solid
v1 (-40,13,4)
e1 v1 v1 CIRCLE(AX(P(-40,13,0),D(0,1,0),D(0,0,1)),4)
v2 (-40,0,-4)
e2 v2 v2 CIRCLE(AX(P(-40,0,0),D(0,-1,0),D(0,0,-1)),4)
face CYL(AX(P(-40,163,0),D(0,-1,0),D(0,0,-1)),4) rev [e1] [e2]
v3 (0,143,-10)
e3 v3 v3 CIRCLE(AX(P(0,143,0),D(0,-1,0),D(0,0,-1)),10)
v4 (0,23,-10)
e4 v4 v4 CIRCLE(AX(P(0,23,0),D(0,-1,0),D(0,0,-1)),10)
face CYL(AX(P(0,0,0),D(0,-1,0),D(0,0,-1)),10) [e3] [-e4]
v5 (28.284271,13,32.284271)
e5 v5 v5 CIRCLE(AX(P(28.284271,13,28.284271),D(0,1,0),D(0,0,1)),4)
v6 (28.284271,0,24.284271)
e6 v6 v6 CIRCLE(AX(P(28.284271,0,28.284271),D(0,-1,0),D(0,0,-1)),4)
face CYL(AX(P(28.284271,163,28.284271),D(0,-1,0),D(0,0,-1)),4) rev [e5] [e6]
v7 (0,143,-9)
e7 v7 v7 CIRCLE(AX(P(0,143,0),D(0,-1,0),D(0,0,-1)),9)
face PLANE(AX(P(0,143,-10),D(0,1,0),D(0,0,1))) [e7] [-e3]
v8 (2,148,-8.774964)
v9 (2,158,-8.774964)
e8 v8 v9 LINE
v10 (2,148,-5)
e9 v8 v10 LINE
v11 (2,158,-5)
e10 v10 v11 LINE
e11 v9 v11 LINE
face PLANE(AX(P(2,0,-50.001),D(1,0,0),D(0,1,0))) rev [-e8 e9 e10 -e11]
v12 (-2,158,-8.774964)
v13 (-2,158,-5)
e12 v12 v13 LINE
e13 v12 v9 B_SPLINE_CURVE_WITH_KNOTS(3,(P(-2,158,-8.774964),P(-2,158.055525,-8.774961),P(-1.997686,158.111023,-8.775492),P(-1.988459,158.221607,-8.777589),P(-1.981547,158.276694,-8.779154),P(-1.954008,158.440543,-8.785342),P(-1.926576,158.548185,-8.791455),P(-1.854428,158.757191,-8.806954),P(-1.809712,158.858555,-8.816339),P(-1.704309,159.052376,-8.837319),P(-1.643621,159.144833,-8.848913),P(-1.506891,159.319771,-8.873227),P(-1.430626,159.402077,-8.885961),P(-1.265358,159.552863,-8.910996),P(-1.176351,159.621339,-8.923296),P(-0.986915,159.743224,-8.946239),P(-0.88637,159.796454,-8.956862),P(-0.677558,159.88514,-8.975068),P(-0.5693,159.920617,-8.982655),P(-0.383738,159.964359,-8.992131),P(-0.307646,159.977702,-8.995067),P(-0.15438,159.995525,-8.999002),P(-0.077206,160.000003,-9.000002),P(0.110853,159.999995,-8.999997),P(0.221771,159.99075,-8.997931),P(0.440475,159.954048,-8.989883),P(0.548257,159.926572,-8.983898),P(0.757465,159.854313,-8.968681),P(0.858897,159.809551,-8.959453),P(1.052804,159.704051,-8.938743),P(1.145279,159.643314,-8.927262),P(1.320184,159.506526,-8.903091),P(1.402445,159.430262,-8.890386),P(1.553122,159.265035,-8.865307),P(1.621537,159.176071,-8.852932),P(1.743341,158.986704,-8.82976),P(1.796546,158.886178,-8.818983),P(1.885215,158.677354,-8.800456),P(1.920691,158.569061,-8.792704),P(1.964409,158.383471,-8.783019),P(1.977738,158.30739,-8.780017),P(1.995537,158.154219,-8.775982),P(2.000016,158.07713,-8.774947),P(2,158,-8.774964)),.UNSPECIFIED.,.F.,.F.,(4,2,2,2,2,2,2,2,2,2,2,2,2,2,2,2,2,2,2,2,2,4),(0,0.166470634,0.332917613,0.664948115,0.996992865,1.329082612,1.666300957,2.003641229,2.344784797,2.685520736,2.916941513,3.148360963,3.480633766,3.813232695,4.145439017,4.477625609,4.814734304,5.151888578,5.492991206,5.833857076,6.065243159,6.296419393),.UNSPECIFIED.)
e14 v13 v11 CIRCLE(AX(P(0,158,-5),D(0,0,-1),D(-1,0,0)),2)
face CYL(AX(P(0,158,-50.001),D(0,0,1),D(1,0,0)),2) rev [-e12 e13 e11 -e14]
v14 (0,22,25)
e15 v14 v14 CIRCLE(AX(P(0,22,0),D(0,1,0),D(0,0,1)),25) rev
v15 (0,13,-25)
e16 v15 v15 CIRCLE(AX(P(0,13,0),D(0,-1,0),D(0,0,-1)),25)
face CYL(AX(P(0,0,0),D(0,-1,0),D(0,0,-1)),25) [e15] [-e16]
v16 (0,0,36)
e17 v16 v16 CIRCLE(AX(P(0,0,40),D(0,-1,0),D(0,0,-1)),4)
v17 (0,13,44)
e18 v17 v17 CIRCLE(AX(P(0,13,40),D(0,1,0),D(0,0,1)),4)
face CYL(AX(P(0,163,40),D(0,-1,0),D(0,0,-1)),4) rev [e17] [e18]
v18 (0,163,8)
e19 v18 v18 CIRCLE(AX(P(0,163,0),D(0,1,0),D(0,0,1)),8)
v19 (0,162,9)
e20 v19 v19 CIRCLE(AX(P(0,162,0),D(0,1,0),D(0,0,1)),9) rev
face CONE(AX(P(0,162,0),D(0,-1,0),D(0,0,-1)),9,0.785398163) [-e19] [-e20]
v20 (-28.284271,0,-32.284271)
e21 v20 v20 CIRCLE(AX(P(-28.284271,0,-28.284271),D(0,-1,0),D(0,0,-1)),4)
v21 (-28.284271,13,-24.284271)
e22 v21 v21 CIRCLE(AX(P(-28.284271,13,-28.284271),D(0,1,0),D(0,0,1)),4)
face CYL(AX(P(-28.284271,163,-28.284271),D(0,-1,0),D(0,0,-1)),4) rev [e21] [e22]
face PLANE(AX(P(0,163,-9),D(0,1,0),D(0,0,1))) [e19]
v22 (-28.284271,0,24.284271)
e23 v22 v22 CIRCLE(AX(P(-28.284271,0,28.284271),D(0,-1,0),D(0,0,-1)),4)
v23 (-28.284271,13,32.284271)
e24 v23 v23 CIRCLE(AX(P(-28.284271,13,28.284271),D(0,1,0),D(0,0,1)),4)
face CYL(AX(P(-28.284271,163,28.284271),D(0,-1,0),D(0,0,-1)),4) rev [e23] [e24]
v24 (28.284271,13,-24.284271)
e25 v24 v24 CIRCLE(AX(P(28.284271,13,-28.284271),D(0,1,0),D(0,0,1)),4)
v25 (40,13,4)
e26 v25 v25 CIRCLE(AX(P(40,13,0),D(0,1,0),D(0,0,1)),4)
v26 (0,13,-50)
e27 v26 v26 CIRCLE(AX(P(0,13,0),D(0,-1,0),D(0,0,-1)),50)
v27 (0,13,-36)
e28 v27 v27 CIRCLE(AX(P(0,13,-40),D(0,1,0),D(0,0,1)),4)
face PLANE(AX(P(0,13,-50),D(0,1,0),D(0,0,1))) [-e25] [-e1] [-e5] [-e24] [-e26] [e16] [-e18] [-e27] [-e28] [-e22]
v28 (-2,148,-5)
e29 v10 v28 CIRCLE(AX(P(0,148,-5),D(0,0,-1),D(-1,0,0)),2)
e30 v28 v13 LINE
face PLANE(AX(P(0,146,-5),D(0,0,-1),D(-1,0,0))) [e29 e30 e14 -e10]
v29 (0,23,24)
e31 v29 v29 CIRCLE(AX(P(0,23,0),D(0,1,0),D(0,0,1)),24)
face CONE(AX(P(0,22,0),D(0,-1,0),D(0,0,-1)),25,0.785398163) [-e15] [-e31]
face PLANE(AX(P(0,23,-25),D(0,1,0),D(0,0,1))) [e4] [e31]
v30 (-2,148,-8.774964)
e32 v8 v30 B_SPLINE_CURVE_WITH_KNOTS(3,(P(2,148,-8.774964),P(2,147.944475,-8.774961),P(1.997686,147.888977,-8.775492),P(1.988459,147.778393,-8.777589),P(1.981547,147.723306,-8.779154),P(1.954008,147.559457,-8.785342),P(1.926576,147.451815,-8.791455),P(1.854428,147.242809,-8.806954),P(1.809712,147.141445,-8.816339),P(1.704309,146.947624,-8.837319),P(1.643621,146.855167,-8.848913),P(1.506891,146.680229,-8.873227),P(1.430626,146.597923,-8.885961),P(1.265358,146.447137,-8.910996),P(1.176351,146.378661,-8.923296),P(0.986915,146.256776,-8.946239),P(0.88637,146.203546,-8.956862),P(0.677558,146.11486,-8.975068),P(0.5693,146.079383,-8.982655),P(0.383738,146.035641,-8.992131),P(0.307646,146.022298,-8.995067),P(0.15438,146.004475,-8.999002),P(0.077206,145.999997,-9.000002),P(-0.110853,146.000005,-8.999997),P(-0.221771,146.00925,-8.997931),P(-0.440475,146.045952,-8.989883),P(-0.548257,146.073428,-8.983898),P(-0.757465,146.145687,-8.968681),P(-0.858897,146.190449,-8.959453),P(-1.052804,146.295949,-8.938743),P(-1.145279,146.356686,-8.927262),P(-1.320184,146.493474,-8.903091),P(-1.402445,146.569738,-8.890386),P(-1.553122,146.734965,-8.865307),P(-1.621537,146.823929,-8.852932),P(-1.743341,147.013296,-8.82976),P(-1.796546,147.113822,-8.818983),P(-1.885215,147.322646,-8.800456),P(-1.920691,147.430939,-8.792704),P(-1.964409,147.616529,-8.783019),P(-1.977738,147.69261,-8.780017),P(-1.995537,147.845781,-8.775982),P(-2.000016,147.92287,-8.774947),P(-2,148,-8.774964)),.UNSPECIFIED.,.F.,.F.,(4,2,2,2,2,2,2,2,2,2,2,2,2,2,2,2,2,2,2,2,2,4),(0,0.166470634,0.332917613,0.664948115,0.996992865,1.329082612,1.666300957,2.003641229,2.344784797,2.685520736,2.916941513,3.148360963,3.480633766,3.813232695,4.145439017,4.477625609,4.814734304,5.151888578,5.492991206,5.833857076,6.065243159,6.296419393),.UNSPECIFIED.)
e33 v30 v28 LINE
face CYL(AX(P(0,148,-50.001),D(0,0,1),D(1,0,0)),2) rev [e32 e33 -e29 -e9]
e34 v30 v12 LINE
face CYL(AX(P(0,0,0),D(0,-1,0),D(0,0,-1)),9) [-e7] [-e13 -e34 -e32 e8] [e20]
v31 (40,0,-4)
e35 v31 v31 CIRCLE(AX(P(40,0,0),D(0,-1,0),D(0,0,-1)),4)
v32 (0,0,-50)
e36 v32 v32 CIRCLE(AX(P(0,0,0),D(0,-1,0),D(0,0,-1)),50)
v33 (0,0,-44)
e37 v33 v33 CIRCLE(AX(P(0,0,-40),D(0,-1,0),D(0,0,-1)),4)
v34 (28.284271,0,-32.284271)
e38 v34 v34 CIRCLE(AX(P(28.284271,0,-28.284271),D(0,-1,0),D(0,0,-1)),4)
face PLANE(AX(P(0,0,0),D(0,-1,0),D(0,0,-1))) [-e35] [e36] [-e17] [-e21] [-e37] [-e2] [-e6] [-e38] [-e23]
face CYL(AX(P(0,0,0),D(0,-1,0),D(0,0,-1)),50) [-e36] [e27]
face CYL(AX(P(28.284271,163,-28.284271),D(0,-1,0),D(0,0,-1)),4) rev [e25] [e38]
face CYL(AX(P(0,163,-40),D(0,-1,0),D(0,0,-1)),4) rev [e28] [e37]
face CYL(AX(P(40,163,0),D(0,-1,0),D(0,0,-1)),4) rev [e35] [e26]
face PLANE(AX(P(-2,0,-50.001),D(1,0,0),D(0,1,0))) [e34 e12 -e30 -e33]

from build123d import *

# Parameters (mm, degrees)
CHAMFER1_SIZE            = 1
CHAMFER2_SIZE            = 1
SKETCH3_R                = 4
CUT_EXTRUDE1_DEPTH       = 178.676672639
CUT_EXTRUDE2_START       = -3
CUT_EXTRUDE2_DEPTH       = 14
BOSS_EXTRUDE1_REACH      = 181.148
BOSS_EXTRUDE1_END_RADIUS = 9


with BuildPart() as part:
    # Sketch2 → Revolve1 (revolve)
    with BuildSketch(Plane(origin=(0, 0, 0), x_dir=(0, 0, -1), z_dir=(1, 0, 0))):
        Polygon((0, 0), (50, 0), (50, 13), (25, 13), (25, 23), (10, 23), (10, 143), (9, 143), (9, 163), (0, 163), align=None)
    revolve(axis=Axis((0, 0, 0), (0, 1, 0)))

    # Chamfer1
    chamfer1_edges = [part.edges().sort_by_distance(p)[0] for p in [
        (0, 163, 9),
    ]]
    chamfer(chamfer1_edges, length=CHAMFER1_SIZE)

    # Chamfer2
    chamfer2_edges = [part.edges().sort_by_distance(p)[0] for p in [
        (0, 23, 25),
    ]]
    chamfer(chamfer2_edges, length=CHAMFER2_SIZE)

    # Sketch3 → Cut-Extrude1 (cut, through all)
    with BuildSketch(Plane.XZ):
        with Locations((40, 0)):
            Circle(SKETCH3_R)
        with Locations((28.284271247, 28.284271247)):
            Circle(SKETCH3_R)
        with Locations((28.284271247, -28.284271247)):
            Circle(SKETCH3_R)
        with Locations((0, 40)):
            Circle(SKETCH3_R)
        with Locations((0, -40)):
            Circle(SKETCH3_R)
        with Locations((-28.284271247, 28.284271247)):
            Circle(SKETCH3_R)
        with Locations((-28.284271247, -28.284271247)):
            Circle(SKETCH3_R)
        with Locations((-40, 0)):
            Circle(SKETCH3_R)
    extrude(amount=-CUT_EXTRUDE1_DEPTH, mode=Mode.SUBTRACT)

    # Sketch5 → Cut-Extrude2 (cut)
    with BuildSketch(Plane(origin=(0, 163, 0), x_dir=(1, 0, 0), z_dir=(0, 1, 0)).offset(CUT_EXTRUDE2_START)):
        with BuildLine():
            Line((-3, 5), (3, 5))
            Line((3, 5), (3, 8.485281374))
            ThreePointArc((3, 8.485281374), (0, 9), (-3, 8.485281374))
            Line((-3, 8.485281374), (-3, 5))
        make_face()
    extrude(amount=-CUT_EXTRUDE2_DEPTH, mode=Mode.SUBTRACT)

    # Boss-Extrude1: up to this cylinder (the profile starts inside it)
    boss_extrude1_end = Plane(origin=(0, 153, 0), z_dir=(0, -1, 0)) * Cylinder(BOSS_EXTRUDE1_END_RADIUS, 381.296, mode=Mode.PRIVATE)
    # Sketch6 → Boss-Extrude1 (add, up to the surface)
    with BuildSketch(Plane(origin=(0, 0, -5), x_dir=(-1, 0, 0), z_dir=(0, 0, -1)), mode=Mode.PRIVATE) as boss_extrude1_sk1:
        with BuildLine():
            ThreePointArc((-2, 158), (-1.414213562, 159.414213562), (0, 160))
            Line((0, 160), (-3, 160))
            Line((-3, 160), (-3, 146))
            Line((-3, 146), (0, 146))
            ThreePointArc((0, 146), (-1.414213562, 146.585786438), (-2, 148))
            Line((-2, 148), (-2, 158))
        make_face()
    boss_extrude1_tool1 = extrude(boss_extrude1_sk1.sketch, amount=BOSS_EXTRUDE1_REACH, mode=Mode.PRIVATE) & boss_extrude1_end
    add(boss_extrude1_tool1.solids().sort_by_distance((2.396584, 153, -5))[0])
    # Sketch6 → Boss-Extrude1 (add, up to the surface)
    with BuildSketch(Plane(origin=(0, 0, -5), x_dir=(-1, 0, 0), z_dir=(0, 0, -1)), mode=Mode.PRIVATE) as boss_extrude1_sk2:
        with BuildLine():
            Line((3, 160), (0, 160))
            ThreePointArc((0, 160), (1.414213562, 159.414213562), (2, 158))
            Line((2, 158), (2, 148))
            ThreePointArc((2, 148), (1.414213562, 146.585786438), (0, 146))
            Line((0, 146), (3, 146))
            Line((3, 146), (3, 160))
        make_face()
    boss_extrude1_tool2 = extrude(boss_extrude1_sk2.sketch, amount=BOSS_EXTRUDE1_REACH, mode=Mode.PRIVATE) & boss_extrude1_end
    add(boss_extrude1_tool2.solids().sort_by_distance((-2.396584, 153, -5))[0])


solid = part.part
